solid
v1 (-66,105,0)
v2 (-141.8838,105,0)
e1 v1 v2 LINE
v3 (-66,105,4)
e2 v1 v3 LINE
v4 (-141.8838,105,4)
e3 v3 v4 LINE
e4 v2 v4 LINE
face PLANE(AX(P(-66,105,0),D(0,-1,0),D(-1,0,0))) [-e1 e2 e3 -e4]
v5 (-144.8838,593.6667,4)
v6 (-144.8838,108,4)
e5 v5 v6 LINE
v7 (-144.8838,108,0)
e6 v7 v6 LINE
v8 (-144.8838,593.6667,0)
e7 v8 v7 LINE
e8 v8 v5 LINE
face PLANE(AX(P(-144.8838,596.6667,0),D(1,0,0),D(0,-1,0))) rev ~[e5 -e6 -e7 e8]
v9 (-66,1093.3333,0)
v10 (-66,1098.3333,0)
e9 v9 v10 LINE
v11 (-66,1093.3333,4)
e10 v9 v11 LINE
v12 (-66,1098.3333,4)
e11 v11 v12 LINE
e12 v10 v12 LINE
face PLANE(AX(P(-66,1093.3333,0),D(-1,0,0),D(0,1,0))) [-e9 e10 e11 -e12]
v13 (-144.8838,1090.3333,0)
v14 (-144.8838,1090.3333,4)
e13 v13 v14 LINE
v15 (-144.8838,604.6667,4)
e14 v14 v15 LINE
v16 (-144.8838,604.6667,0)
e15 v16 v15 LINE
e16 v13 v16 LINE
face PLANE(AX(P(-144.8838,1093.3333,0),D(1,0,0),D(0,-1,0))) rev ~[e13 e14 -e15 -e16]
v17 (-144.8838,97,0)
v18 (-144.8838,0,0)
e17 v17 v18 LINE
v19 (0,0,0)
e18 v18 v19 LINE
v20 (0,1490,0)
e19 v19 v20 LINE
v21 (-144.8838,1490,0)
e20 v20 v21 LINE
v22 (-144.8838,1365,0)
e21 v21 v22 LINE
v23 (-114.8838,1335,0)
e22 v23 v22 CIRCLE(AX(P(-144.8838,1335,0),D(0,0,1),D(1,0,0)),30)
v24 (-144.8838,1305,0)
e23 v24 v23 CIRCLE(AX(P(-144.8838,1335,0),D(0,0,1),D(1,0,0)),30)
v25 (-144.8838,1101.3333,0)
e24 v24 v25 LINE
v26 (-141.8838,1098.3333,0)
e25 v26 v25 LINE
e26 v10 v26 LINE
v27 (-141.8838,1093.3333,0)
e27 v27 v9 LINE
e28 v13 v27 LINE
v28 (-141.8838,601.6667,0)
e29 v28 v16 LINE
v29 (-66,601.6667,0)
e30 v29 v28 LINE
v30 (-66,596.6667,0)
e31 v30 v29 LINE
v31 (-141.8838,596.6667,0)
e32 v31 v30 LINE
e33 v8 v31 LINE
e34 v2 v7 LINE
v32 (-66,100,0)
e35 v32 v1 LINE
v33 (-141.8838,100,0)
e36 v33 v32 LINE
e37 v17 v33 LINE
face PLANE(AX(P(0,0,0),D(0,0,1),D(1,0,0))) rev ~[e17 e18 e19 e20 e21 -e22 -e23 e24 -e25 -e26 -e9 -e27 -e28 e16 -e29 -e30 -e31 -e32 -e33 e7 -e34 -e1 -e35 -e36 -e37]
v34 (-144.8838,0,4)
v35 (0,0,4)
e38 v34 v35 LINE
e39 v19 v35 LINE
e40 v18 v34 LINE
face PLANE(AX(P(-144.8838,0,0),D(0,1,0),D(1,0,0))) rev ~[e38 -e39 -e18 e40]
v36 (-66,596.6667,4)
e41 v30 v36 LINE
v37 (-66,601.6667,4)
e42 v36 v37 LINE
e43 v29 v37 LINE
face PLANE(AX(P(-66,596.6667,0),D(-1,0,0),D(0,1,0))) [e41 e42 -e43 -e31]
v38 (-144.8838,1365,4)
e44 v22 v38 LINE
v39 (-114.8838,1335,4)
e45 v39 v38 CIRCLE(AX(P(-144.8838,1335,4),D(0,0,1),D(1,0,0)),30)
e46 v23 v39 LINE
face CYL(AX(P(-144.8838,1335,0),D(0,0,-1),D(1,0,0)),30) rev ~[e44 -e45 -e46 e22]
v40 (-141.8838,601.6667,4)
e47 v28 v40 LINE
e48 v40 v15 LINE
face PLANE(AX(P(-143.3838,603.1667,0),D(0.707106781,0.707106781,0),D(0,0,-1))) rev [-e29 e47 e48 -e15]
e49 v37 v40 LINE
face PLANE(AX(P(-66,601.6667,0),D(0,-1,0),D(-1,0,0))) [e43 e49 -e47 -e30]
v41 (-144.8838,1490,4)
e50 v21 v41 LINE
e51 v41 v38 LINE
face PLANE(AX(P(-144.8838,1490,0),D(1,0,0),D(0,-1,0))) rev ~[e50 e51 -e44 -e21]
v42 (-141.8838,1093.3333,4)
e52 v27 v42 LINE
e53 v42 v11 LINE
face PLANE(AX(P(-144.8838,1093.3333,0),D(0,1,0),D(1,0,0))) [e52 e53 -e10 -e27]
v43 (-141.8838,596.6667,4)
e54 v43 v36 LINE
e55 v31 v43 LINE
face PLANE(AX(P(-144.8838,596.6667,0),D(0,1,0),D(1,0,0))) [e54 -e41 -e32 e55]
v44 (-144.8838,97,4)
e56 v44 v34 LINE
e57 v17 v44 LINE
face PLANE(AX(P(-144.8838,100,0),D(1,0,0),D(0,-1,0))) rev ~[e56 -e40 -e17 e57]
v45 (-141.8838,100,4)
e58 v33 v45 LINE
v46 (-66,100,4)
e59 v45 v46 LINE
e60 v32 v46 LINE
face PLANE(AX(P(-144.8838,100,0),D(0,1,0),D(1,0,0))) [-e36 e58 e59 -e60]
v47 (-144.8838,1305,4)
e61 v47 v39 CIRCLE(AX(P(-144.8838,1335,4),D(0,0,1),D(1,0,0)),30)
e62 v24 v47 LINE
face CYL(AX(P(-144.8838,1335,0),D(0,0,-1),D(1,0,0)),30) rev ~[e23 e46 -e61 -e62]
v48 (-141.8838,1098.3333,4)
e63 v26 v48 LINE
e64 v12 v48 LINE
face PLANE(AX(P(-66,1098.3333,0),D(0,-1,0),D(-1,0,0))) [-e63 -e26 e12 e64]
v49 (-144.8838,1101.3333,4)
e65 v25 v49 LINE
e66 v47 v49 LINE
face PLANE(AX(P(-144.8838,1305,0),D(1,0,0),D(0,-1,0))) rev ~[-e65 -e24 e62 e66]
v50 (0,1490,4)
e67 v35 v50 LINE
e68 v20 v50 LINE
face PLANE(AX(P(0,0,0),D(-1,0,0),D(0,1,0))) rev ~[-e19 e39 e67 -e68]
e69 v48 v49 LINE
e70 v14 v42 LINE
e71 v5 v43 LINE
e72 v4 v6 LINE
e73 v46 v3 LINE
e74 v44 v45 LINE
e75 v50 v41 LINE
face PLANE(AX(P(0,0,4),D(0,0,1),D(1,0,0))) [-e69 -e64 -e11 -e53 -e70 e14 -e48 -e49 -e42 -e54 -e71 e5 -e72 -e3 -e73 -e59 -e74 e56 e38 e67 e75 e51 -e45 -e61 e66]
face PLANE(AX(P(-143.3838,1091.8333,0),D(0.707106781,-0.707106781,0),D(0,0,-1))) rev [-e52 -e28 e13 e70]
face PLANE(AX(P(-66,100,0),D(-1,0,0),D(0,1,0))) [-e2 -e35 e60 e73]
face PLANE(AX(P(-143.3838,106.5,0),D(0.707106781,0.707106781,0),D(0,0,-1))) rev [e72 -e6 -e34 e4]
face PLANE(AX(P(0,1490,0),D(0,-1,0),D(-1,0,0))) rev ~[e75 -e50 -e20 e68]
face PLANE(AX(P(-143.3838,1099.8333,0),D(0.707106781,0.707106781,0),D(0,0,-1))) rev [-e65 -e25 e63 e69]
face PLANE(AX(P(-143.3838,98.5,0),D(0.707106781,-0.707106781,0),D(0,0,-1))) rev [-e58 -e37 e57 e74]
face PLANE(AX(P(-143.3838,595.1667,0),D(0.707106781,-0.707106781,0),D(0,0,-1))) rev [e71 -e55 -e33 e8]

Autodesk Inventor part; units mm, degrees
ref_plane "YZ Plane" through (0, 0, 0) normal (1, 0, 0) x (0, 1, 0)
ref_plane "XZ Plane" through (0, 0, 0) normal (0, 1, 0) x (-1, 0, 0)
ref_plane "XY Plane" through (0, 0, 0) normal (0, 0, 1) x (1, 0, 0)
sketch "Sketch1" plane through (0, 0, 0) normal (0, 0, 1) x (1, 0, 0)
  line L0 (0, 1490) -> (-144.8838, 1490)
  line L1 (-144.8838, 1490) -> (-144.8838, 0)
  line L2 (-144.8838, 0) -> (0, 0)
  line L3 (0, 0) -> (0, 1490)
  line L4 (-144.8838, 100) -> (-66, 100)
  line L5 (-66, 100) -> (-66, 105)
  line L6 (-66, 105) -> (-144.8838, 105)
  line L7 (-144.8838, 105) -> (-144.8838, 100)
  line L8 (-144.8838, 596.6667) -> (-66, 596.6667)
  line L9 (-66, 596.6667) -> (-66, 601.6667)
  line L10 (-66, 601.6667) -> (-144.8838, 601.6667)
  line L11 (-144.8838, 601.6667) -> (-144.8838, 596.6667)
  line L12 (-144.8838, 1093.3333) -> (-66, 1093.3333)
  line L13 (-66, 1093.3333) -> (-66, 1098.3333)
  line L14 (-66, 1098.3333) -> (-144.8838, 1098.3333)
  line L15 (-144.8838, 1098.3333) -> (-144.8838, 1093.3333)
  circle A0 centre (-144.8838, 1335) radius 30
  point P0 (-144.8838, 1098.3333)
  point P1 (-144.8838, 1093.3333)
  point P2 (-144.8838, 105)
  point P3 (-144.8838, 1365)
  point P4 (-144.8838, 1305)
  dimension "d0" = 1490
  dimension "d1" = 144.8838
  dimension "d2" = 5
  dimension "d4" = 100
  dimension "d7" = 496.6667
  dimension "d23" = 66
  dimension "d29" = 60
  dimension "d30" = 1335
extrude "Plate1" add sketch "Sketch1" along normal blind 4 contours L3 L2 L1 L4 L5 L6 L8 L9 L10 L12 L13 L14 A0 L0
chamfer "Corner Chamfer1" distance 3 angle 45 6 edges at (-144.8838, 100, 2) (-144.8838, 105, 2) (-144.8838, 596.6667, 2) (-144.8838, 601.6667, 2) (-144.8838, 1098.3333, 2) (-144.8838, 1093.3333, 2)
equation "\"d0\" = Стрингер_длина"
equation "\"d1\" = стрингер_глубина_5"
equation "\"d2\" = паз_под_стрингер_толщина"
equation "\"d7\" = Шаг_шпангоутов"
equation "\"d23\" = паз_под_стрингер_глубина - Thickness"
equation "\"d29\" = 2 * радиус_выреза_под_сварку"
equation "\"d12\" = Thickness"
equation "\"BendRadius\" = Thickness"
equation "\"BendReliefWidth\" = Thickness"
equation "\"BendReliefDepth\" = 0.5 * Thickness"
equation "\"CornerReliefSize\" = 4 * Thickness"
equation "\"MinimumRemnant\" = 2 * Thickness"
equation "\"TransitionRadius\" = BendRadius"
equation "\"JacobiRadiusSize\" = BendRadius"
equation "\"GapSize\" = Thickness"
equation "\"Стрингер_длина\" = 1490"
equation "\"стрингер_глубина_5\" = 144.883787"
equation "\"паз_под_стрингер_толщина\" = 5"
equation "\"Шаг_шпангоутов\" = 496.666667"
equation "\"паз_под_стрингер_глубина\" = 70"
equation "\"Thickness\" = 4"
equation "\"радиус_выреза_под_сварку\" = 30"
properties part number "GBK 3203 stringer 5" material "Steel"
